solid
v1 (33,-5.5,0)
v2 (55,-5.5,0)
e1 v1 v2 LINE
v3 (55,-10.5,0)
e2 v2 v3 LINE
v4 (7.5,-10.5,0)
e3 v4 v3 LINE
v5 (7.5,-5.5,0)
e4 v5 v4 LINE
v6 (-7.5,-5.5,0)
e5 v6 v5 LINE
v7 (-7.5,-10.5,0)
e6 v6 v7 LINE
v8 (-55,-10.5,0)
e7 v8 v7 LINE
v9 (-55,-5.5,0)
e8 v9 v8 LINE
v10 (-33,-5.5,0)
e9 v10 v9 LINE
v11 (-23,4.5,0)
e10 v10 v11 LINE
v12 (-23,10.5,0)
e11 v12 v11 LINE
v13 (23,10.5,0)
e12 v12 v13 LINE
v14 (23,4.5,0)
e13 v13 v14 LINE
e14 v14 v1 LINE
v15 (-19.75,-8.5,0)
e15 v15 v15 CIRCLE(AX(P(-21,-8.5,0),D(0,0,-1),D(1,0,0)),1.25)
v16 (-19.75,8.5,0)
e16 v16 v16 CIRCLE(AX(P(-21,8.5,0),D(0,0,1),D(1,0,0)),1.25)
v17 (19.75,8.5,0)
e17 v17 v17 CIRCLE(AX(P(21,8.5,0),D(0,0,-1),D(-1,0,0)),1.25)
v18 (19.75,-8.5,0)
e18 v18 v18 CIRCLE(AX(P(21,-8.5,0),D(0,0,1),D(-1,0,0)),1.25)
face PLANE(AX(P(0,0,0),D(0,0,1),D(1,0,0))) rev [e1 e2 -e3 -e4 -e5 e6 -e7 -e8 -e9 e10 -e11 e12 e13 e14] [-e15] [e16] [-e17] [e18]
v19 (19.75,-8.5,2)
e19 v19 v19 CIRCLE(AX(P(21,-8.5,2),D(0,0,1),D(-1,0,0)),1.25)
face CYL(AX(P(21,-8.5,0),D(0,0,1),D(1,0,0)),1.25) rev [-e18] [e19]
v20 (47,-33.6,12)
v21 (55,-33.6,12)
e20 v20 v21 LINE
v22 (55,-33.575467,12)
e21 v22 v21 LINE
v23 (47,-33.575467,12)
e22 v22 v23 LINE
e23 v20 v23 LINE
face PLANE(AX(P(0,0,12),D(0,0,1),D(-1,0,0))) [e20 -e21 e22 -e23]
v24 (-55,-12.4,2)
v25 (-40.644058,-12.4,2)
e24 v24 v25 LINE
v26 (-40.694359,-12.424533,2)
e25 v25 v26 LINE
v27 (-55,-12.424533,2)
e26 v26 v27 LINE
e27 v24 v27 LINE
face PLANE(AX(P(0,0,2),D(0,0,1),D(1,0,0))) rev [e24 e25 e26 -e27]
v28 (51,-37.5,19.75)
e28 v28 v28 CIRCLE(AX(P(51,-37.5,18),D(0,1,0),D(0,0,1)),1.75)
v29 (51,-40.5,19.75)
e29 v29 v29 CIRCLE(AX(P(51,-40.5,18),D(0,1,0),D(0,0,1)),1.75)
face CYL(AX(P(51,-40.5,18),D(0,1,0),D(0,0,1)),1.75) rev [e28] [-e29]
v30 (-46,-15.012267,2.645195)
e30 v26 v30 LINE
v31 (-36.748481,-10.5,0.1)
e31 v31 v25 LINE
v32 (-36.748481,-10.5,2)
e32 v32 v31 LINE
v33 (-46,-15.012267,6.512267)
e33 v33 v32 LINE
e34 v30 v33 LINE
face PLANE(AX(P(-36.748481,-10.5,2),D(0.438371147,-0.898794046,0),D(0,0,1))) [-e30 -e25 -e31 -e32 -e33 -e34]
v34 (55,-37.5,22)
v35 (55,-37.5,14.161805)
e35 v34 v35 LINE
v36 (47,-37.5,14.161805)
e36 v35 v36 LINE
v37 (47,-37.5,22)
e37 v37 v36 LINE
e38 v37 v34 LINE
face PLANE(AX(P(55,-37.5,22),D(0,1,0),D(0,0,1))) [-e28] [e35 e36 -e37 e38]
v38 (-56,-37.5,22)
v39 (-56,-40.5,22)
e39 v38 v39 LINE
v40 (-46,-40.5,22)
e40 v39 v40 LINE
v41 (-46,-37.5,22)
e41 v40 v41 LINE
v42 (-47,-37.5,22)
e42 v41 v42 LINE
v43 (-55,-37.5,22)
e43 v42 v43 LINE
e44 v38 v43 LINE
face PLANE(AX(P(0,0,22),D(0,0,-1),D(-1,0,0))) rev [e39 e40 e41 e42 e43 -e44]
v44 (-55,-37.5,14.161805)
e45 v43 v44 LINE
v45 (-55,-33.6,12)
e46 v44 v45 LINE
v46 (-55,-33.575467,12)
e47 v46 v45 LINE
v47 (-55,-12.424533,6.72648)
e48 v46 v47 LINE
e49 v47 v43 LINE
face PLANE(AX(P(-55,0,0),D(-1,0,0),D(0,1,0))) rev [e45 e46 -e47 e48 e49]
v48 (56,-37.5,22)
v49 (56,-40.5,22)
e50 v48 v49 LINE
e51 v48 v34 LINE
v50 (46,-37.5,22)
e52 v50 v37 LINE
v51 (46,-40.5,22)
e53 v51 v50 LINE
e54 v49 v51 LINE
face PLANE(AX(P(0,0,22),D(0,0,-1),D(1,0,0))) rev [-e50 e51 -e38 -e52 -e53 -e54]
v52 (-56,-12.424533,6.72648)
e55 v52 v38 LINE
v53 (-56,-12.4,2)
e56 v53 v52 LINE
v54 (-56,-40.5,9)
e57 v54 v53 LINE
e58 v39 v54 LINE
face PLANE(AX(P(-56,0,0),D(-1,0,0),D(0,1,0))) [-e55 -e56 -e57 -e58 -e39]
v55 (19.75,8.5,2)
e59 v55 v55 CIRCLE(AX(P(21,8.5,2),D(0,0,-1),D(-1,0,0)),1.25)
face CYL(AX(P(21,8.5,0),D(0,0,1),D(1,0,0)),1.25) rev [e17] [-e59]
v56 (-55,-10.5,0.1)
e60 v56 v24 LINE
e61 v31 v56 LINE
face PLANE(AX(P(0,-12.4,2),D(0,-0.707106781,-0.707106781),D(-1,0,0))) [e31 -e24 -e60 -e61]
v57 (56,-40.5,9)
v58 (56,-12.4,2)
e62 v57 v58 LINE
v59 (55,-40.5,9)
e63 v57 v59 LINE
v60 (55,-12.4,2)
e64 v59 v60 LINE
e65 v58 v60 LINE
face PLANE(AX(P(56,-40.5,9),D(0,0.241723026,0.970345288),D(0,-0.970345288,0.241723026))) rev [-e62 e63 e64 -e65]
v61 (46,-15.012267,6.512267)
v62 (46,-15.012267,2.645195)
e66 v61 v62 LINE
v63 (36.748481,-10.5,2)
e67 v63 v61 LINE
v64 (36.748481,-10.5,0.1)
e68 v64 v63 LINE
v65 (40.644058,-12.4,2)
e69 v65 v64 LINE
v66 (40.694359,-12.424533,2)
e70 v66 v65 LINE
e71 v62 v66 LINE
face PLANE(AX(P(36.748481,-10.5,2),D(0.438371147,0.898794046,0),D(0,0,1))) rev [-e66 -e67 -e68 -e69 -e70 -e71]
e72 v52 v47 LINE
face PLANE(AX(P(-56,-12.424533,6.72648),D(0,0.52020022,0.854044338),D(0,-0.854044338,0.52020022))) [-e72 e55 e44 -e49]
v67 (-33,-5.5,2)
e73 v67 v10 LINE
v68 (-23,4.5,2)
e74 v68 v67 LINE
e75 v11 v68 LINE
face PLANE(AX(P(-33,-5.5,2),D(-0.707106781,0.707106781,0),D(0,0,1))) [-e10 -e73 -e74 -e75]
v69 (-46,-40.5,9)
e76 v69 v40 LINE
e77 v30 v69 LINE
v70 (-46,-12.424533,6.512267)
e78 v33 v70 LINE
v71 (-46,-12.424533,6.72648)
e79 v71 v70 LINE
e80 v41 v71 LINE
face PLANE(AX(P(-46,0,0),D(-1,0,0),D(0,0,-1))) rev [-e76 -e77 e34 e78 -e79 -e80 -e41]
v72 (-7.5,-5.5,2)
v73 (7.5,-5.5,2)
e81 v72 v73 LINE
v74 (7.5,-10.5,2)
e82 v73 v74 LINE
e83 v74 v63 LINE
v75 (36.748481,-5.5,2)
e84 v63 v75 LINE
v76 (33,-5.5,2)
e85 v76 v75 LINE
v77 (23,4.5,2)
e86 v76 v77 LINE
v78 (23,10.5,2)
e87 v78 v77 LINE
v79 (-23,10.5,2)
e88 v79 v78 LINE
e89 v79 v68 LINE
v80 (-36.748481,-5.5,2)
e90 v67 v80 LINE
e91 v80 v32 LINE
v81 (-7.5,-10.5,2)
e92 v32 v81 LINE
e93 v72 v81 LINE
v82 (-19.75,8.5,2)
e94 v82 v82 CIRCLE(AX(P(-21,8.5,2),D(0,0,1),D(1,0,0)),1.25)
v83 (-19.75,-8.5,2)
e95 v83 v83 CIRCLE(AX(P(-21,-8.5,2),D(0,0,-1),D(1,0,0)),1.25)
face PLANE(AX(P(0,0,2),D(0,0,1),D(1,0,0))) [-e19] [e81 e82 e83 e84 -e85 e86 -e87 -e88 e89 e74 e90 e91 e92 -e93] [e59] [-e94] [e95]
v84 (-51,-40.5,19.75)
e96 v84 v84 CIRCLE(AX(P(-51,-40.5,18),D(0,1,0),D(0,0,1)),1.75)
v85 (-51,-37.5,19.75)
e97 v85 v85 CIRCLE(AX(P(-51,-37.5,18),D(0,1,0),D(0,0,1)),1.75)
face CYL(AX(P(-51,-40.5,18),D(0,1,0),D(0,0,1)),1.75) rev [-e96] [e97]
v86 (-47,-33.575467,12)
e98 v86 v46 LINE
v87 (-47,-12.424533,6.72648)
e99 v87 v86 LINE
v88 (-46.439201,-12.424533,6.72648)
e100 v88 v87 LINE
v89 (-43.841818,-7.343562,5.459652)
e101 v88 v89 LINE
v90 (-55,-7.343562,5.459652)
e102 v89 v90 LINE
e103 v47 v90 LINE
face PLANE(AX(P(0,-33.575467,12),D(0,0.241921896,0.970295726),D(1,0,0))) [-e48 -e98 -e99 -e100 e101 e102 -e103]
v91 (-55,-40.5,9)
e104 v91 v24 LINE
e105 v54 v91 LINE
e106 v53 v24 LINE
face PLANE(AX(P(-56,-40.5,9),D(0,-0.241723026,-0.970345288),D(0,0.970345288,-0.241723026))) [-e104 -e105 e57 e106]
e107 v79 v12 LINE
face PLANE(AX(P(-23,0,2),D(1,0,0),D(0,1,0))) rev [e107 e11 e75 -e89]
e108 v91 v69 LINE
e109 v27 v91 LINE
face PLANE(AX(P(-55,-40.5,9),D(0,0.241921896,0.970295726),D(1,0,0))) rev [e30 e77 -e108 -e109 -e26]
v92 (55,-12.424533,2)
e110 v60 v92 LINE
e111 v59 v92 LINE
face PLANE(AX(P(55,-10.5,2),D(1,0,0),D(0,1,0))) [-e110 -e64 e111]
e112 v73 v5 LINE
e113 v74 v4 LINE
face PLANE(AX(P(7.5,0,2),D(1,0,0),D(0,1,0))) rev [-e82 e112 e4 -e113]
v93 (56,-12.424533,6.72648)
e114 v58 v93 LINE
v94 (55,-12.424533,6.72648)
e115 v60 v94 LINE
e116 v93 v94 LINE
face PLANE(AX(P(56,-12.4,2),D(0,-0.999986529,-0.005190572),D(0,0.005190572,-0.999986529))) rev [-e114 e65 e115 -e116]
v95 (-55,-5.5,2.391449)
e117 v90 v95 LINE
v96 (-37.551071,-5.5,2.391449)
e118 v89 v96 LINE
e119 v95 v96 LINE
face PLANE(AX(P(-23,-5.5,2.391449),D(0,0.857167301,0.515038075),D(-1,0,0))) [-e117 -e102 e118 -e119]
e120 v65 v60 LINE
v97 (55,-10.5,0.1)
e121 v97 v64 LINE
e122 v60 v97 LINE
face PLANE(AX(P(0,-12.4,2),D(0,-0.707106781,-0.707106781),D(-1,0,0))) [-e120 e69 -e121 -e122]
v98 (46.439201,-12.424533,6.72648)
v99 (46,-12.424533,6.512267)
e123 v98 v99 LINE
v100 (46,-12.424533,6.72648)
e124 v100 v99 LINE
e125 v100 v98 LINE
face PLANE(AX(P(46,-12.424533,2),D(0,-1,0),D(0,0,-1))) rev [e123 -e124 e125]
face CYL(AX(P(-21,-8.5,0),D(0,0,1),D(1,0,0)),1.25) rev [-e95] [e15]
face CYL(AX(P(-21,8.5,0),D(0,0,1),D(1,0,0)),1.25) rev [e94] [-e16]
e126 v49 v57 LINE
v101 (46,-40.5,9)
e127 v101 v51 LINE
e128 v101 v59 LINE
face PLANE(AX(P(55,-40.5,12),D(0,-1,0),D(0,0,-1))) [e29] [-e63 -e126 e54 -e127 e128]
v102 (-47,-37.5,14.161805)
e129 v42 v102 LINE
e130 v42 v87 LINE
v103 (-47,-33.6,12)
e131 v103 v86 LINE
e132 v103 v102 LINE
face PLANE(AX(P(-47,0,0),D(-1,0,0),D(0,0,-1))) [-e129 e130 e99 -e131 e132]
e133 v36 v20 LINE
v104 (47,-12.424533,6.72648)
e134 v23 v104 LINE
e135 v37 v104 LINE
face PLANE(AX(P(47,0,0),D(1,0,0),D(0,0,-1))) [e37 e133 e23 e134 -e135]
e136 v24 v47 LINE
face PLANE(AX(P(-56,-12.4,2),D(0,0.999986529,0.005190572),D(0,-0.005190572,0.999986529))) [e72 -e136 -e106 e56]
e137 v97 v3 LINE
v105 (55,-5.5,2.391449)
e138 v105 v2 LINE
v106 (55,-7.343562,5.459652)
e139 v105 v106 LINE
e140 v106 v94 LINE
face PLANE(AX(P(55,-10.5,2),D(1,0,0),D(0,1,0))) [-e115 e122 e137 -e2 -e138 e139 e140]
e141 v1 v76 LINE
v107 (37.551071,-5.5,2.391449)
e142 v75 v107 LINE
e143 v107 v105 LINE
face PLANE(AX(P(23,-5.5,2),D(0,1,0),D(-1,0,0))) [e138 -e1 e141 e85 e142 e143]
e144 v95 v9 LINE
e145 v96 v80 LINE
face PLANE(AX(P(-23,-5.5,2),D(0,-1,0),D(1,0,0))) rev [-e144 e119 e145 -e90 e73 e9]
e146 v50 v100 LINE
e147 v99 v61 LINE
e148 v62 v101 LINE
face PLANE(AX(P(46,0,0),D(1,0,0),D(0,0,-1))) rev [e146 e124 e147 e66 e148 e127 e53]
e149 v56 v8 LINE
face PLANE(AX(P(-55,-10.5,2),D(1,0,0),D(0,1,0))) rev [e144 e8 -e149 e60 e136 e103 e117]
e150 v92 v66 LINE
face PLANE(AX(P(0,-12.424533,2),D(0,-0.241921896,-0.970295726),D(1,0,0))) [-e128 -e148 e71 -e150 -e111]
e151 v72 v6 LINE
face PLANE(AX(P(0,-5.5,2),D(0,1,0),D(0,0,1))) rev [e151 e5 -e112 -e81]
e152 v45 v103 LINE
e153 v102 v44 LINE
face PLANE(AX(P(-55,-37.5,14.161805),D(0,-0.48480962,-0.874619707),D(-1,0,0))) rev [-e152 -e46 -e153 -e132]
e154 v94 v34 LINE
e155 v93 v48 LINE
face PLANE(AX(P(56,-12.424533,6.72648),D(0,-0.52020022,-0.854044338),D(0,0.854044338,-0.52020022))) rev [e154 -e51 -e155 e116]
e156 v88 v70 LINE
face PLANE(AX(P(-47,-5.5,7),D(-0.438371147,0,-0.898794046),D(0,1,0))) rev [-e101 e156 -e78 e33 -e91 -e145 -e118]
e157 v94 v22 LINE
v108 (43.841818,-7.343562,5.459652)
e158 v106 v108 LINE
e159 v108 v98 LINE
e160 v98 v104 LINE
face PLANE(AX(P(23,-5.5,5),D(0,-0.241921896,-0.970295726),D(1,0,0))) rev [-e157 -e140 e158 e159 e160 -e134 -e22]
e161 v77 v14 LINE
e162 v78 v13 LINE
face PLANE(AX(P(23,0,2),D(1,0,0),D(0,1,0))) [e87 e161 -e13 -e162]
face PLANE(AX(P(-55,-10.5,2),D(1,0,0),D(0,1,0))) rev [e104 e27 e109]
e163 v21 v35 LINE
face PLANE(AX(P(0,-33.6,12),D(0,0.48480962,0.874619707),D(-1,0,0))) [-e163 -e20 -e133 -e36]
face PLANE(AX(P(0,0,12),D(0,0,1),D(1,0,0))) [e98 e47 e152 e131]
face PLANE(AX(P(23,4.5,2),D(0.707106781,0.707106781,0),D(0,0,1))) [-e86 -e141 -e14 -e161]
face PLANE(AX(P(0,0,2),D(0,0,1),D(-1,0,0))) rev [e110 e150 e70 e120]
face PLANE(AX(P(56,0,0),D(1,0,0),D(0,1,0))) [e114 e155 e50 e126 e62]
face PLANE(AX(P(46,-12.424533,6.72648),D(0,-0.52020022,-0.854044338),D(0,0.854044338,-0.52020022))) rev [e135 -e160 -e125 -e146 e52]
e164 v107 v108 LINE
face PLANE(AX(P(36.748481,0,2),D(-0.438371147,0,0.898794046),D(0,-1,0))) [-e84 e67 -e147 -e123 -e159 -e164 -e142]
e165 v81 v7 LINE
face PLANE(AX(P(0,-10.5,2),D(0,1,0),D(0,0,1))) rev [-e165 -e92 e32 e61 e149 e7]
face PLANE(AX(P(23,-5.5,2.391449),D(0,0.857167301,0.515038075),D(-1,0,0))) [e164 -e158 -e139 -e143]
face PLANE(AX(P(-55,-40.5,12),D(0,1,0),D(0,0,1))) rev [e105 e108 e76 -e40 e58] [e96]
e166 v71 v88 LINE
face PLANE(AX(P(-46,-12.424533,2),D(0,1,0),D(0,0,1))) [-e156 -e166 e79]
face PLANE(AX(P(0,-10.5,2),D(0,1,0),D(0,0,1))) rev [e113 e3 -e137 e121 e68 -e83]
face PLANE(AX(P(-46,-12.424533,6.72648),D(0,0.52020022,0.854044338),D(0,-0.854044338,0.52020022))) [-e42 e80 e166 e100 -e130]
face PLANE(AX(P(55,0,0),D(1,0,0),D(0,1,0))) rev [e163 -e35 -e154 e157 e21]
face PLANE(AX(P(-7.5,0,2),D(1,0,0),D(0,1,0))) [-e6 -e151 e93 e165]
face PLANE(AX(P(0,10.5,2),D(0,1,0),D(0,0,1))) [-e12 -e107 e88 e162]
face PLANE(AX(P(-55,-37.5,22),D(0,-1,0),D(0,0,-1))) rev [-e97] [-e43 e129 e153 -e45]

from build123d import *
from OCP.BRepFilletAPI import BRepFilletAPI_MakeChamfer

# Parameters (mm, degrees)
BOSS_EXTRUDE1_DEPTH                        = 2
SKETCH2_R                                  = 1.25
CUT_EXTRUDE1_DEPTH                         = 26.362373706
MIRROR1_AT_THE_SECOND_PLANE_COPY_1_SKETC_R = 1.25
MIRROR1_AT_THE_SECOND_PLANE_COPY_1_DEPTH   = 26.362373706
SKETCH4_W                                  = 32
SKETCH4_H                                  = 5
BOSS_EXTRUDE2_DEPTH                        = 2
SKETCH5_W                                  = 8
SKETCH5_H                                  = 35
BOSS_EXTRUDE3_DEPTH                        = 10
CHAMFER3_SIZE                              = 7
CHAMFER3_SIZE2                             = 28.075466535
CHAMFER2_SIZE                              = 1.9
CHAMFER2_SIZE2                             = 2.60855061
SKETCH6_W                                  = 8
SKETCH6_H                                  = 3
BOSS_EXTRUDE4_DEPTH                        = 10
CHAMFER4_SIZE                              = 3.9
CHAMFER4_SIZE2                             = 2.161805301
CHAMFER3_OF_MIRROR3_SIZE                   = 7
CHAMFER3_OF_MIRROR3_SIZE2                  = 28.075466535
CHAMFER2_OF_MIRROR3_SIZE                   = 1.9
CHAMFER2_OF_MIRROR3_SIZE2                  = 2.60855061
CHAMFER4_OF_MIRROR3_SIZE2                  = 3.9
CHAMFER4_OF_MIRROR3_SIZE                   = 2.161805301
CHAMFER1_SIZE                              = 10
CHAMFER5_SIZE                              = 10.251519208
CHAMFER5_SIZE_2                            = 5
BOSS_EXTRUDE5_DEPTH                        = 1
BOSS_EXTRUDE6_DEPTH                        = 1
SKETCH9_R                                  = 1.75
CUT_EXTRUDE2_DEPTH                         = 77.96752562


with BuildPart() as part:
    # Sketch1 → Boss-Extrude1 (new body)
    with BuildSketch(Plane.XY):
        Polygon((23, 10.5), (-23, 10.5), (-23, -10.5), (-7.5, -10.5), (-7.5, -5.5), (7.5, -5.5), (7.5, -10.5), (23, -10.5), align=None)
    extrude(amount=BOSS_EXTRUDE1_DEPTH)

    # Sketch2 → Cut-Extrude1 (cut, through all)
    with BuildSketch(Plane.XY.offset(2)):
        with Locations((-21, 8.5)):
            Circle(SKETCH2_R)
    cut_extrude1 = extrude(amount=-CUT_EXTRUDE1_DEPTH, mode=Mode.SUBTRACT)

    # Mirror1: Cut-Extrude1 across plane
    add(cut_extrude1.mirror(Plane(origin=(0, 0, 0), x_dir=(0, 0, 1), z_dir=(1, 0, 0))), mode=Mode.SUBTRACT)

    # Mirror1 at the second plane: Cut-Extrude1 across plane
    add(cut_extrude1.mirror(Plane.ZX), mode=Mode.SUBTRACT)

    # Mirror1 at the second plane copy 1 sketc → Mirror1 at the second plane copy 1 (cut, through all)
    with BuildSketch(Plane(origin=(0, 0, 2), x_dir=(-1, 0, 0), z_dir=(0, 0, 1))):
        with Locations((-21, 8.5)):
            Circle(MIRROR1_AT_THE_SECOND_PLANE_COPY_1_SKETC_R)
    extrude(amount=-MIRROR1_AT_THE_SECOND_PLANE_COPY_1_DEPTH, mode=Mode.SUBTRACT)

    # Sketch4 → Boss-Extrude2 (add)
    with BuildSketch(Plane.XY):
        with Locations((-39, -8)):
            Rectangle(SKETCH4_W, SKETCH4_H)
    boss_extrude2 = extrude(amount=BOSS_EXTRUDE2_DEPTH)

    # Sketch5 → Boss-Extrude3 (add)
    with BuildSketch(Plane.XY.offset(2)):
        with Locations((-51, -23)):
            Rectangle(SKETCH5_W, SKETCH5_H)
    boss_extrude3 = extrude(amount=BOSS_EXTRUDE3_DEPTH)

    # Chamfer3: one chamfer whose edges measure the first distance from different faces: ONE call of the kernel's chamfer builder (chamfer() names one face for all edges)
    chamfer3_edges_1 = [part.edges().sort_by_distance(p)[0] for p in [
        (-51, -40.5, 2),
    ]]
    chamfer3_side_1 = [part.faces().sort_by_distance(p)[0] for p in [
        (-51, -40.5, 7),
    ]]
    chamfer3_edges_2 = [part.edges().sort_by_distance(p)[0] for p in [
        (-51, -5.5, 12),
    ]]
    chamfer3_side_2 = [part.faces().sort_by_distance(p)[0] for p in [
        (-54.65823985, -5.5, 6),
    ]]
    chamfer3 = BRepFilletAPI_MakeChamfer(part.part.solid().wrapped)
    for e in chamfer3_edges_1:
        chamfer3.Add(CHAMFER3_SIZE, CHAMFER3_SIZE2, e.wrapped, chamfer3_side_1[0].wrapped)  # the first distance lies on this face
    for e in chamfer3_edges_2:
        chamfer3.Add(CHAMFER3_SIZE, CHAMFER3_SIZE2, e.wrapped, chamfer3_side_2[0].wrapped)  # the first distance lies on this face
    add(Compound.cast(chamfer3.Shape()), mode=Mode.REPLACE)

    # Chamfer2: one chamfer whose edges measure the first distance from different faces: ONE call of the kernel's chamfer builder (chamfer() names one face for all edges)
    chamfer2_edges_1 = [part.edges().sort_by_distance(p)[0] for p in [
        (-51, -10.5, 2),
    ]]
    chamfer2_edges_2 = [part.edges().sort_by_distance(p)[0] for p in [
        (-51, -5.5, 5),
    ]]
    chamfer2_side_2 = [part.faces().sort_by_distance(p)[0] for p in [
        (-51, -19.537733267, 8.5),
    ]]
    chamfer2 = BRepFilletAPI_MakeChamfer(part.part.solid().wrapped)
    for e in chamfer2_edges_1:
        chamfer2.Add(CHAMFER2_SIZE, e.wrapped)
    for e in chamfer2_edges_2:
        chamfer2.Add(CHAMFER2_SIZE, CHAMFER2_SIZE2, e.wrapped, chamfer2_side_2[0].wrapped)  # the first distance lies on this face
    add(Compound.cast(chamfer2.Shape()), mode=Mode.REPLACE)

    # Sketch6 → Boss-Extrude4 (add)
    with BuildSketch(Plane.XY.offset(12)):
        with Locations((-51, -39)):
            Rectangle(SKETCH6_W, SKETCH6_H)
    boss_extrude4 = extrude(amount=BOSS_EXTRUDE4_DEPTH)

    # Chamfer4
    chamfer4_edges = [part.edges().sort_by_distance(p)[0] for p in [
        (-51, -37.5, 12),
    ]]
    chamfer4_side = [part.faces().sort_by_distance(p)[0] for p in [
        (-51, -35.537733267, 12),
    ]]
    chamfer(chamfer4_edges, length=CHAMFER4_SIZE, length2=CHAMFER4_SIZE2, reference=chamfer4_side[0])

    # Mirror3: Boss-Extrude2, Boss-Extrude3, Boss-Extrude4 across plane
    add(boss_extrude2.mirror(Plane(origin=(0, 0, 0), x_dir=(0, 0, 1), z_dir=(1, 0, 0))))
    add(boss_extrude3.mirror(Plane(origin=(0, 0, 0), x_dir=(0, 0, 1), z_dir=(1, 0, 0))))
    add(boss_extrude4.mirror(Plane(origin=(0, 0, 0), x_dir=(0, 0, 1), z_dir=(1, 0, 0))))

    # Chamfer3 of Mirror3: one chamfer whose edges measure the first distance from different faces: ONE call of the kernel's chamfer builder (chamfer() names one face for all edges)
    chamfer3_of_mirror3_edges_1 = [part.edges().sort_by_distance(p)[0] for p in [
        (51, -40.5, 2),
    ]]
    chamfer3_of_mirror3_side_1 = [part.faces().sort_by_distance(p)[0] for p in [
        (51, -40.5, 7),
    ]]
    chamfer3_of_mirror3_edges_2 = [part.edges().sort_by_distance(p)[0] for p in [
        (51, -5.5, 12),
    ]]
    chamfer3_of_mirror3_side_2 = [part.faces().sort_by_distance(p)[0] for p in [
        (54.65823985, -5.5, 6),
    ]]
    chamfer3_of_mirror3 = BRepFilletAPI_MakeChamfer(part.part.solid().wrapped)
    for e in chamfer3_of_mirror3_edges_1:
        chamfer3_of_mirror3.Add(CHAMFER3_OF_MIRROR3_SIZE, CHAMFER3_OF_MIRROR3_SIZE2, e.wrapped, chamfer3_of_mirror3_side_1[0].wrapped)  # the first distance lies on this face
    for e in chamfer3_of_mirror3_edges_2:
        chamfer3_of_mirror3.Add(CHAMFER3_OF_MIRROR3_SIZE, CHAMFER3_OF_MIRROR3_SIZE2, e.wrapped, chamfer3_of_mirror3_side_2[0].wrapped)  # the first distance lies on this face
    add(Compound.cast(chamfer3_of_mirror3.Shape()), mode=Mode.REPLACE)

    # Chamfer2 of Mirror3: one chamfer whose edges measure the first distance from different faces: ONE call of the kernel's chamfer builder (chamfer() names one face for all edges)
    chamfer2_of_mirror3_edges_1 = [part.edges().sort_by_distance(p)[0] for p in [
        (51, -10.5, 2),
    ]]
    chamfer2_of_mirror3_edges_2 = [part.edges().sort_by_distance(p)[0] for p in [
        (51, -5.5, 5),
    ]]
    chamfer2_of_mirror3_side_2 = [part.faces().sort_by_distance(p)[0] for p in [
        (51, -19.537733267, 8.5),
    ]]
    chamfer2_of_mirror3 = BRepFilletAPI_MakeChamfer(part.part.solid().wrapped)
    for e in chamfer2_of_mirror3_edges_1:
        chamfer2_of_mirror3.Add(CHAMFER2_OF_MIRROR3_SIZE, e.wrapped)
    for e in chamfer2_of_mirror3_edges_2:
        chamfer2_of_mirror3.Add(CHAMFER2_OF_MIRROR3_SIZE, CHAMFER2_OF_MIRROR3_SIZE2, e.wrapped, chamfer2_of_mirror3_side_2[0].wrapped)  # the first distance lies on this face
    add(Compound.cast(chamfer2_of_mirror3.Shape()), mode=Mode.REPLACE)

    # Chamfer4 of Mirror3
    chamfer4_of_mirror3_edges = [part.edges().sort_by_distance(p)[0] for p in [
        (51, -37.5, 12),
    ]]
    chamfer(chamfer4_of_mirror3_edges, length=CHAMFER4_OF_MIRROR3_SIZE, length2=CHAMFER4_OF_MIRROR3_SIZE2)

    # Chamfer1
    chamfer1_edges = [part.edges().sort_by_distance(p)[0] for p in [
        (23, -5.5, 1),
        (-23, -5.5, 1),
    ]]
    chamfer(chamfer1_edges, length=CHAMFER1_SIZE)

    # Chamfer5
    # the kernel refuses this chamfer: 10.251519208, 5 mm, written as the material it adds along each edge
    with BuildSketch(Plane(origin=(-47, -10.5, 28.554001508), x_dir=(1, 0, 0), z_dir=(0, 0, -1))) as chamfer5_piece_1_section:
        Polygon((CHAMFER5_SIZE, 0), (0, CHAMFER5_SIZE_2), (0, 0), align=None)
    chamfer5_piece_1 = extrude(amount=55.008003016, mode=Mode.PRIVATE)
    chamfer5_piece_1 = split(chamfer5_piece_1, bisect_by=Plane(origin=(-47, -16.84580993, 3.102348031), z_dir=(0, 0.24192189559966532, 0.9702957262759971)), keep=Keep.TOP, mode=Mode.PRIVATE)
    chamfer5_piece_1 = split(chamfer5_piece_1, bisect_by=Plane(origin=(-47, -10.5, 2), z_dir=(0, 0, 1)), keep=Keep.TOP, mode=Mode.PRIVATE)
    chamfer5_piece_1 = split(chamfer5_piece_1, bisect_by=Plane(origin=(-47, -24.727000754, 14.327000754), z_dir=(0, -0.7071067811865475, -0.7071067811865477)), keep=Keep.TOP, mode=Mode.PRIVATE)
    add(chamfer5_piece_1)
    with BuildSketch(Plane(origin=(-47, -10.5, 2), x_dir=(1, 0, 0), z_dir=(0, 0, -1))) as chamfer5_piece_2_section:
        Polygon((CHAMFER5_SIZE, 0), (0, CHAMFER5_SIZE_2), (0, 0), align=None)
    chamfer5_piece_2 = extrude(amount=28.454001508, mode=Mode.PRIVATE)
    chamfer5_piece_2 = split(chamfer5_piece_2, bisect_by=Plane(origin=(-47, -11.45, 1.05), z_dir=(0, 0.7071067811865475, 0.7071067811865477)), keep=Keep.TOP, mode=Mode.PRIVATE)
    add(chamfer5_piece_2)
    with BuildSketch(Plane(origin=(-47, -5.5, 2), x_dir=(1, 0, 0), z_dir=(0, -1, 0))) as chamfer5_piece_3_section:
        Polygon((CHAMFER5_SIZE, 0), (0, CHAMFER5_SIZE_2), (0, 0), align=None)
    chamfer5_piece_3 = extrude(amount=5, mode=Mode.PRIVATE)
    chamfer5_piece_3 = split(chamfer5_piece_3, bisect_by=Plane(origin=(-47, -5.327185351, 2.103837517), z_dir=(0, -0.8571673007021119, -0.5150380749100548)), keep=Keep.TOP, mode=Mode.PRIVATE)
    chamfer5_piece_3 = split(chamfer5_piece_3, bisect_by=Plane(origin=(-47, -4.795792656, 4.824421389), z_dir=(0, -0.24192189559966532, -0.9702957262759971)), keep=Keep.TOP, mode=Mode.PRIVATE)
    add(chamfer5_piece_3)
    with BuildSketch(Plane(origin=(47, -5.5, 2), x_dir=(-1, 0, 0), z_dir=(0, -1, 0))) as chamfer5_piece_4_section:
        Polygon((CHAMFER5_SIZE, 0), (0, -CHAMFER5_SIZE_2), (0, 0), align=None)
    chamfer5_piece_4 = extrude(amount=5, mode=Mode.PRIVATE)
    chamfer5_piece_4 = split(chamfer5_piece_4, bisect_by=Plane(origin=(47, -5.327185351, 2.103837517), z_dir=(0, -0.8571673007021119, -0.5150380749100548)), keep=Keep.TOP, mode=Mode.PRIVATE)
    chamfer5_piece_4 = split(chamfer5_piece_4, bisect_by=Plane(origin=(47, -4.795792656, 4.824421389), z_dir=(0, -0.24192189559966532, -0.9702957262759971)), keep=Keep.TOP, mode=Mode.PRIVATE)
    add(chamfer5_piece_4)
    with BuildSketch(Plane(origin=(47, -10.5, 2), x_dir=(0, -1, 0), z_dir=(0, 0, -1))) as chamfer5_piece_5_section:
        Polygon((CHAMFER5_SIZE_2, 0), (0, CHAMFER5_SIZE), (0, 0), align=None)
    chamfer5_piece_5 = extrude(amount=28.454001508, mode=Mode.PRIVATE)
    chamfer5_piece_5 = split(chamfer5_piece_5, bisect_by=Plane(origin=(47, -11.45, 1.05), z_dir=(0, 0.7071067811865475, 0.7071067811865477)), keep=Keep.TOP, mode=Mode.PRIVATE)
    add(chamfer5_piece_5)
    with BuildSketch(Plane(origin=(47, -10.5, 28.554001508), x_dir=(0, -1, 0), z_dir=(0, 0, -1))) as chamfer5_piece_6_section:
        Polygon((CHAMFER5_SIZE_2, 0), (0, CHAMFER5_SIZE), (0, 0), align=None)
    chamfer5_piece_6 = extrude(amount=55.008003016, mode=Mode.PRIVATE)
    chamfer5_piece_6 = split(chamfer5_piece_6, bisect_by=Plane(origin=(47, -16.84580993, 3.102348031), z_dir=(0, 0.24192189559966532, 0.9702957262759971)), keep=Keep.TOP, mode=Mode.PRIVATE)
    chamfer5_piece_6 = split(chamfer5_piece_6, bisect_by=Plane(origin=(47, -10.5, 2), z_dir=(0, 0, 1)), keep=Keep.TOP, mode=Mode.PRIVATE)
    chamfer5_piece_6 = split(chamfer5_piece_6, bisect_by=Plane(origin=(47, -24.727000754, 14.327000754), z_dir=(0, -0.7071067811865475, -0.7071067811865477)), keep=Keep.TOP, mode=Mode.PRIVATE)
    add(chamfer5_piece_6)
    with BuildSketch(Plane(origin=(-47, -5.5, 2), x_dir=(1, 0, 0), z_dir=(0, -1, 0))) as chamfer5_piece_7a_section:
        Polygon((CHAMFER5_SIZE, 0), (0, CHAMFER5_SIZE_2), (0, 0), align=None)
    chamfer5_piece_7a = extrude(amount=31.554001508, mode=Mode.PRIVATE)
    chamfer5_piece_7a = split(chamfer5_piece_7a, bisect_by=Plane(origin=(-47, -10.5, 2), z_dir=(0, -1, 0)), keep=Keep.TOP, mode=Mode.PRIVATE)
    chamfer5_piece_7a = split(chamfer5_piece_7a, bisect_by=Plane(origin=(-47, -4.795792656, 4.824421389), z_dir=(0, -0.24192189559966532, -0.9702957262759971)), keep=Keep.TOP, mode=Mode.PRIVATE)
    chamfer5_piece_7a = split(chamfer5_piece_7a, bisect_by=Plane(origin=(-47, -8.95, -1.45), z_dir=(0, 0.7071067811865475, 0.7071067811865477)), keep=Keep.TOP, mode=Mode.PRIVATE)
    with BuildSketch(Plane(origin=(-47, -10.5, 28.554001508), x_dir=(1, 0, 0), z_dir=(0, 0, -1))) as chamfer5_piece_7b_section:
        Polygon((CHAMFER5_SIZE, 0), (0, CHAMFER5_SIZE_2), (0, 0), align=None)
    chamfer5_piece_7b = extrude(amount=55.008003016, mode=Mode.PRIVATE)
    chamfer5_piece_7b = split(chamfer5_piece_7b, bisect_by=Plane(origin=(-47, -15.736335931, 7.552205194), z_dir=(0, -0.24192189559966532, -0.9702957262759971)), keep=Keep.TOP, mode=Mode.PRIVATE)
    chamfer5_piece_7b = split(chamfer5_piece_7b, bisect_by=Plane(origin=(-47, -10.5, 2), z_dir=(0, 0, 1)), keep=Keep.TOP, mode=Mode.PRIVATE)
    chamfer5_piece_7b = split(chamfer5_piece_7b, bisect_by=Plane(origin=(-47, -24.727000754, 14.327000754), z_dir=(0, 0.7071067811865475, 0.7071067811865477)), keep=Keep.TOP, mode=Mode.PRIVATE)
    chamfer5_piece_7 = chamfer5_piece_7a & chamfer5_piece_7b
    add(chamfer5_piece_7)
    with BuildSketch(Plane(origin=(47, -5.5, 2), x_dir=(-1, 0, 0), z_dir=(0, -1, 0))) as chamfer5_piece_8a_section:
        Polygon((CHAMFER5_SIZE, 0), (0, -CHAMFER5_SIZE_2), (0, 0), align=None)
    chamfer5_piece_8a = extrude(amount=31.554001508, mode=Mode.PRIVATE)
    chamfer5_piece_8a = split(chamfer5_piece_8a, bisect_by=Plane(origin=(47, -10.5, 2), z_dir=(0, -1, 0)), keep=Keep.TOP, mode=Mode.PRIVATE)
    chamfer5_piece_8a = split(chamfer5_piece_8a, bisect_by=Plane(origin=(47, -4.795792656, 4.824421389), z_dir=(0, -0.24192189559966532, -0.9702957262759971)), keep=Keep.TOP, mode=Mode.PRIVATE)
    chamfer5_piece_8a = split(chamfer5_piece_8a, bisect_by=Plane(origin=(47, -8.95, -1.45), z_dir=(0, 0.7071067811865475, 0.7071067811865477)), keep=Keep.TOP, mode=Mode.PRIVATE)
    with BuildSketch(Plane(origin=(47, -10.5, 28.554001508), x_dir=(0, -1, 0), z_dir=(0, 0, -1))) as chamfer5_piece_8b_section:
        Polygon((CHAMFER5_SIZE_2, 0), (0, CHAMFER5_SIZE), (0, 0), align=None)
    chamfer5_piece_8b = extrude(amount=55.008003016, mode=Mode.PRIVATE)
    chamfer5_piece_8b = split(chamfer5_piece_8b, bisect_by=Plane(origin=(47, -15.736335931, 7.552205194), z_dir=(0, -0.24192189559966532, -0.9702957262759971)), keep=Keep.TOP, mode=Mode.PRIVATE)
    chamfer5_piece_8b = split(chamfer5_piece_8b, bisect_by=Plane(origin=(47, -10.5, 2), z_dir=(0, 0, 1)), keep=Keep.TOP, mode=Mode.PRIVATE)
    chamfer5_piece_8b = split(chamfer5_piece_8b, bisect_by=Plane(origin=(47, -24.727000754, 14.327000754), z_dir=(0, 0.7071067811865475, 0.7071067811865477)), keep=Keep.TOP, mode=Mode.PRIVATE)
    chamfer5_piece_8 = chamfer5_piece_8a & chamfer5_piece_8b
    add(chamfer5_piece_8)

    # Sketch7 → Boss-Extrude5 (add)
    with BuildSketch(Plane.ZY.offset(-47)):
        Polygon((22, -40.5), (9, -40.5), (2, -12.424533465), (6.7264801, -12.424533465), (22, -37.5), align=None)
    boss_extrude5 = extrude(amount=BOSS_EXTRUDE5_DEPTH)

    # Sketch8 → Boss-Extrude6 (add)
    with BuildSketch(Plane(origin=(55, 0, 0), x_dir=(0, 0, -1), z_dir=(1, 0, 0))):
        Polygon((-22, -37.5), (-22, -40.5), (-9, -40.5), (-2, -12.4), (-6.7264801, -12.424533465), align=None)
    boss_extrude6 = extrude(amount=BOSS_EXTRUDE6_DEPTH)

    # Mirror4: Boss-Extrude5, Boss-Extrude6 across plane
    add(boss_extrude5.mirror(Plane(origin=(0, 0, 0), x_dir=(0, 0, 1), z_dir=(1, 0, 0))))
    add(boss_extrude6.mirror(Plane(origin=(0, 0, 0), x_dir=(0, 0, 1), z_dir=(1, 0, 0))))

    # Sketch9 → Cut-Extrude2 (cut, through all)
    with BuildSketch(Plane(origin=(0, -37.5, 0), x_dir=(1, 0, 0), z_dir=(0, 1, 0))):
        with Locations(Location((-51, -18, 0), (0, 0, 270))):
            Circle(SKETCH9_R)
        with Locations(Location((51, -18, 0), (0, 0, 270))):
            Circle(SKETCH9_R)
    extrude(amount=-CUT_EXTRUDE2_DEPTH, mode=Mode.SUBTRACT)


solid = part.part
